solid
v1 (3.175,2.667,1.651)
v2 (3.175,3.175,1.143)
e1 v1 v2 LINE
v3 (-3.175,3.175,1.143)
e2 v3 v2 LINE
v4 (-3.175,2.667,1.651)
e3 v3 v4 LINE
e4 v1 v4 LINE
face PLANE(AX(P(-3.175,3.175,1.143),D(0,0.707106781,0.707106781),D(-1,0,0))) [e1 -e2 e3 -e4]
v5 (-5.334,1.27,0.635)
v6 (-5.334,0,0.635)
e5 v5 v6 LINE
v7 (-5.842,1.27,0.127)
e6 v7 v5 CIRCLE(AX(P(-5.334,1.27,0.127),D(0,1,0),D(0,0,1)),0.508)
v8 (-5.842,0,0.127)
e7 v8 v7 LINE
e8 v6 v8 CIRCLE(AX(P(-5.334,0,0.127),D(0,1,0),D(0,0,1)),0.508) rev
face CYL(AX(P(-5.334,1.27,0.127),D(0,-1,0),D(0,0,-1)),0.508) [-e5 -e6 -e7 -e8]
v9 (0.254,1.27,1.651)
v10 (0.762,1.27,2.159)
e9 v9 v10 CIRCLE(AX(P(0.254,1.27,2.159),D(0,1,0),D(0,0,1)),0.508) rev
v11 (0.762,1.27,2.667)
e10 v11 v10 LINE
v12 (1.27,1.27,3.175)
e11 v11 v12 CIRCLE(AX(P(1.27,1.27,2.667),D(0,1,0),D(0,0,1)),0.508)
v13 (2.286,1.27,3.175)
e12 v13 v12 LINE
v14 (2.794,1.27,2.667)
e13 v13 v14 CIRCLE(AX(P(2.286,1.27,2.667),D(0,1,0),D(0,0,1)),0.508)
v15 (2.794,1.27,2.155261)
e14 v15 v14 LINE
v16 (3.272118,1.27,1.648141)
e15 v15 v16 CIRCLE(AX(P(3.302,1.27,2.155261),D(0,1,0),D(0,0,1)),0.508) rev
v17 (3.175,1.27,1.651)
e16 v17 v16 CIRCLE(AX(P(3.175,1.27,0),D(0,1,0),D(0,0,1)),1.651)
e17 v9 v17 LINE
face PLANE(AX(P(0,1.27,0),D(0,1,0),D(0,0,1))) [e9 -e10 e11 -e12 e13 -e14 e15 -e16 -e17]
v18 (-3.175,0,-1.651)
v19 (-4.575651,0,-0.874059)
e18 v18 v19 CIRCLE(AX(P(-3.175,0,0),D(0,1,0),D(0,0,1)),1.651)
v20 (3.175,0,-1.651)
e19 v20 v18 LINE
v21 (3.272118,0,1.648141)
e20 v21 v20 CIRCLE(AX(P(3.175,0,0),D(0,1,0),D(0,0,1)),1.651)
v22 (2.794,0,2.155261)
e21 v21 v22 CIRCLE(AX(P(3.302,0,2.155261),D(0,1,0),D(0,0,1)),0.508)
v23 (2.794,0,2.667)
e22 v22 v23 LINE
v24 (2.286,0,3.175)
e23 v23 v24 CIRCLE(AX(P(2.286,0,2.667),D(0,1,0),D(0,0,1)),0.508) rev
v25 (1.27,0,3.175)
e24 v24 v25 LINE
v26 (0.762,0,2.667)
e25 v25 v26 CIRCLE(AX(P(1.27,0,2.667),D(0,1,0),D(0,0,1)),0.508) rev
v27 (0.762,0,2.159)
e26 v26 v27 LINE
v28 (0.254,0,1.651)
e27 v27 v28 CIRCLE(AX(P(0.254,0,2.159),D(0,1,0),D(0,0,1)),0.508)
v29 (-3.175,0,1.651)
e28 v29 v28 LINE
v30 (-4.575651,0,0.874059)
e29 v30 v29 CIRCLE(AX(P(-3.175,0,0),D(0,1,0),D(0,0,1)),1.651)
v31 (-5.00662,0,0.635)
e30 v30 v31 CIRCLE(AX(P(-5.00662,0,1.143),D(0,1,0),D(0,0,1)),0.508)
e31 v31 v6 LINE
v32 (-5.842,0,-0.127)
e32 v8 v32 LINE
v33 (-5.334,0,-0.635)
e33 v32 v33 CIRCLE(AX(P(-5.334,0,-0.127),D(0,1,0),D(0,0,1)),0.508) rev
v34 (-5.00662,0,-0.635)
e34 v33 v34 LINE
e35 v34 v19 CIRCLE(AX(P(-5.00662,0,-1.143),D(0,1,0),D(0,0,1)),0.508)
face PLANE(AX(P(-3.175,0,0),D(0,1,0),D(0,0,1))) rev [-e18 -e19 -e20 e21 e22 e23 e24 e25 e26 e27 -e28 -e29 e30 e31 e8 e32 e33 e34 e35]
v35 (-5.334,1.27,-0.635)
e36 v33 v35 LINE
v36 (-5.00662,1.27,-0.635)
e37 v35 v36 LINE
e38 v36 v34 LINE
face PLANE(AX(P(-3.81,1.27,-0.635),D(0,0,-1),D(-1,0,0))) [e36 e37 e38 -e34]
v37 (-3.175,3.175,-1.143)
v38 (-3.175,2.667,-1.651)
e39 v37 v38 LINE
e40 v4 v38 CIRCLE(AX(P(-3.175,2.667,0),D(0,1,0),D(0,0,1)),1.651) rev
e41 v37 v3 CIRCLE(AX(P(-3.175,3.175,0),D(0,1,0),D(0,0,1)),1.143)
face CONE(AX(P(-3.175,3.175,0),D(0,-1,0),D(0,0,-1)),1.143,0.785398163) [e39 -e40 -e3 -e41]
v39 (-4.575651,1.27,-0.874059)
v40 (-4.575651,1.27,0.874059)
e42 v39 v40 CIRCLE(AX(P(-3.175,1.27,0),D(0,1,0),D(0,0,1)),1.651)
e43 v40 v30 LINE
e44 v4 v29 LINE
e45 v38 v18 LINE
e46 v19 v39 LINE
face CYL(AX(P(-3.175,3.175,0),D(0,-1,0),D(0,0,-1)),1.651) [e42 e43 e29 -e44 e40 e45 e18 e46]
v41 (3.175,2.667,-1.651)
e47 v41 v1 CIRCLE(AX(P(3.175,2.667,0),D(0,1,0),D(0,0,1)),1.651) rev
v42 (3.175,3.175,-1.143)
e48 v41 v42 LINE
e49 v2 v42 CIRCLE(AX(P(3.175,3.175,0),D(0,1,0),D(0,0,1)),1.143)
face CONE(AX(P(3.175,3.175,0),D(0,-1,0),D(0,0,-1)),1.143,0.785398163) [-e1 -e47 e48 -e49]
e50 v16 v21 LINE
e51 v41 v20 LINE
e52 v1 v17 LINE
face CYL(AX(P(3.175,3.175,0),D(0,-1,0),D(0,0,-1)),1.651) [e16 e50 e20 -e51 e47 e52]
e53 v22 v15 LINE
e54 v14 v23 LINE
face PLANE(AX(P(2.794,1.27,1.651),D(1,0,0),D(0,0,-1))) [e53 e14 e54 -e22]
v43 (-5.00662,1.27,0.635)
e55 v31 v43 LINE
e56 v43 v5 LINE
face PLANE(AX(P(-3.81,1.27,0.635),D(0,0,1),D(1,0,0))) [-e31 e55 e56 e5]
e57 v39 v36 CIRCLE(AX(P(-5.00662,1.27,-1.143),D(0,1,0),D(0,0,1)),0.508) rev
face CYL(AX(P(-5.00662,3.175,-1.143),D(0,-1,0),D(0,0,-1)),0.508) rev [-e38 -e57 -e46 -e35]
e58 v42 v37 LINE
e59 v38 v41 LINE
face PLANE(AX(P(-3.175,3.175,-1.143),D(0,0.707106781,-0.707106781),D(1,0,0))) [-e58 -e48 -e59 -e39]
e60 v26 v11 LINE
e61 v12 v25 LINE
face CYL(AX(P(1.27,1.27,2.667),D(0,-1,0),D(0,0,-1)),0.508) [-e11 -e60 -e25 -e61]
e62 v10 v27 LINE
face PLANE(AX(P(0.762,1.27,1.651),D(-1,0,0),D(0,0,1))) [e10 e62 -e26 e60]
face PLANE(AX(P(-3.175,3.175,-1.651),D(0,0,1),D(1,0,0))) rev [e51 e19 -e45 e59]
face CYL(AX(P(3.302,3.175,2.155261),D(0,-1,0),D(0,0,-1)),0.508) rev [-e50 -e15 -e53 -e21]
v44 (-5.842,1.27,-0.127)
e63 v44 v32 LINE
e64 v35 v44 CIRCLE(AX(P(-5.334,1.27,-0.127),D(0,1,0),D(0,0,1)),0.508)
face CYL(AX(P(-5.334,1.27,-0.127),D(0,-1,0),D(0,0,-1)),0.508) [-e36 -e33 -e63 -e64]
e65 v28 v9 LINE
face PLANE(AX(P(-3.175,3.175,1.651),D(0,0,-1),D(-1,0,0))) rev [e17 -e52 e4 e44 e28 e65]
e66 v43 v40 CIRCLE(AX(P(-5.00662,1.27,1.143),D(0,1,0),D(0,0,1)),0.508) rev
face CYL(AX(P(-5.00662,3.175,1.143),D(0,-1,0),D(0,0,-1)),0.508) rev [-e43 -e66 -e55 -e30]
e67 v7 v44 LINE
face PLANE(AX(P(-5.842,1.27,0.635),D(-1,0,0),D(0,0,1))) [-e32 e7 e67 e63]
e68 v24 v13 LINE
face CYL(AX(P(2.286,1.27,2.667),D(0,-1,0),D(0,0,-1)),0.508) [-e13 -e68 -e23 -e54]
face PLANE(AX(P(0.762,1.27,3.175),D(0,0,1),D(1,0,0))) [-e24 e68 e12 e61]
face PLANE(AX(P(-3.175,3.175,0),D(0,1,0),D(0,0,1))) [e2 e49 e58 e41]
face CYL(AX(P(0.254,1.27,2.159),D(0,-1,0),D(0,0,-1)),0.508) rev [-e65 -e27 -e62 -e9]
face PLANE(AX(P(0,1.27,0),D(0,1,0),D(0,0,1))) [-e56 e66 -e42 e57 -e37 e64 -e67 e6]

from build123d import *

# Parameters (mm, degrees)
BOSS_EXTRUDE1_DEPTH = 3.175
SKETCH2_W           = 2.032
SKETCH2_H           = 1.524
SKETCH2_H_2         = 1.27
BOSS_EXTRUDE2_DEPTH = 1.27
CHAMFER1_SIZE       = 0.508
FILLET1_R           = 0.508


with BuildPart() as part:
    # Sketch1 → Boss-Extrude1 (new body)
    with BuildSketch(Plane(origin=(0, 0, 0), x_dir=(1, 0, 0), z_dir=(0, 1, 0))):
        with BuildLine():
            Line((-3.175, 1.651), (3.175, 1.651))
            ThreePointArc((3.175, 1.651), (4.826, 0), (3.175, -1.651))
            Line((3.175, -1.651), (-3.175, -1.651))
            ThreePointArc((-3.175, -1.651), (-4.826, 0), (-3.175, 1.651))
        make_face()
    extrude(amount=BOSS_EXTRUDE1_DEPTH)

    # Sketch2 → Boss-Extrude2 (add)
    with BuildSketch(Plane.XZ):
        with Locations((1.778, 2.413)):
            Rectangle(SKETCH2_W, SKETCH2_H)
        with Locations((-4.826, 0)):
            Rectangle(SKETCH2_W, SKETCH2_H_2)
    extrude(amount=-BOSS_EXTRUDE2_DEPTH)

    # Chamfer1
    chamfer1_edges = [part.edges().sort_by_distance(p)[0] for p in [
        (4.826, 3.175, 0),
        (0, 3.175, -1.651),
        (-4.826, 3.175, 0),
        (0, 3.175, 1.651),
    ]]
    chamfer(chamfer1_edges, length=CHAMFER1_SIZE)

    # Fillet1
    # the kernel refuses this fillet: 0.508 mm, written as the material it adds along each edge
    with BuildSketch(Plane(origin=(0.762, 0, 1.651), x_dir=(-1, 0, 0), z_dir=(0, 1, 0))) as fillet1_piece_1:
        with BuildLine():
            CenterArc((FILLET1_R, FILLET1_R), FILLET1_R, 180, 90)
            Line((0, FILLET1_R), (0, 0))
            Line((0, 0), (FILLET1_R, 0))
        make_face()
    extrude(amount=1.27)
    with BuildSketch(Plane(origin=(2.794, 0, 1.651), x_dir=(0.999982123617744, 0, -0.005979334824793291), z_dir=(0, 1, 0))) as fillet1_piece_2:
        with BuildLine():
            CenterArc((0.504975771, -0.507289957), FILLET1_R, 93.029693992, 86.627713317)
            Line((-0.003015148, -0.504252455), (-0.05381424, -0.503948704))
            Line((-0.05381424, -0.503948704), (-0.050799092, 0.00030375))
            Line((-0.050799092, 0.00030375), (0.00030375, 0.050799092))
            ThreePointArc((0.00030375, 0.050799092), (0.381296939, 0.048520965), (0.475441237, 0.050728996))
            Line((0.475441237, 0.050728996), (0.478126194, 0))
        make_face()
    extrude(amount=1.27)
    with BuildSketch(Plane(origin=(-4.699, 1.27, -0.635), x_dir=(0.45853775751047177, 0, -0.8886749264704544), z_dir=(0, -1, 0))) as fillet1_piece_3:
        with BuildLine():
            CenterArc((0.310391456, -0.506311404), FILLET1_R, 94.672926901, 58.034281249)
            Line((-0.141055407, -0.273374223), (0, 0))
            ThreePointArc((0, 0), (0.134502964, -0.005487936), (0.269005928, 0))
        make_face()
    extrude(amount=1.27)
    with BuildSketch(Plane(origin=(-4.699, 1.27, 0.635), x_dir=(0.45853775751047327, 0, 0.8886749264704539), z_dir=(0, -1, 0))) as fillet1_piece_4:
        with BuildLine():
            CenterArc((0.310391456, 0.506311404), FILLET1_R, 207.292791849, 58.034281249)
            Line((-0.141055407, 0.273374223), (0, 0))
            ThreePointArc((0, 0), (0.134502964, 0.005487936), (0.269005928, 0))
        make_face()
    extrude(amount=1.27)
    # the kernel refuses this fillet: 0.508 mm, written as the material it takes off along each edge
    with BuildSketch(Plane(origin=(0.762, -1.27, 3.175), x_dir=(0, 0, -1), z_dir=(0, 1, 0)), Plane(origin=(2.794, -1.27, 3.175), x_dir=(-1, 0, 0), z_dir=(0, 1, 0)), Plane(origin=(-5.842, -1.27, 0.635), x_dir=(0, 0, -1), z_dir=(0, 1, 0))) as fillet1_2_piece_1:
        with BuildLine():
            CenterArc((FILLET1_R, -FILLET1_R), FILLET1_R, 90, 90)
            Line((0, -FILLET1_R), (0, 0))
            Line((0, 0), (FILLET1_R, 0))
        make_face()
    extrude(amount=3.81, mode=Mode.SUBTRACT)
    with BuildSketch(Plane(origin=(-5.842, -1.27, -0.635), x_dir=(0, 0, 1), z_dir=(0, 1, 0))) as fillet1_2_piece_2:
        with BuildLine():
            CenterArc((FILLET1_R, FILLET1_R), FILLET1_R, 180, 90)
            Line((0, FILLET1_R), (0, 0))
            Line((0, 0), (FILLET1_R, 0))
        make_face()
    extrude(amount=3.81, mode=Mode.SUBTRACT)


solid = part.part
